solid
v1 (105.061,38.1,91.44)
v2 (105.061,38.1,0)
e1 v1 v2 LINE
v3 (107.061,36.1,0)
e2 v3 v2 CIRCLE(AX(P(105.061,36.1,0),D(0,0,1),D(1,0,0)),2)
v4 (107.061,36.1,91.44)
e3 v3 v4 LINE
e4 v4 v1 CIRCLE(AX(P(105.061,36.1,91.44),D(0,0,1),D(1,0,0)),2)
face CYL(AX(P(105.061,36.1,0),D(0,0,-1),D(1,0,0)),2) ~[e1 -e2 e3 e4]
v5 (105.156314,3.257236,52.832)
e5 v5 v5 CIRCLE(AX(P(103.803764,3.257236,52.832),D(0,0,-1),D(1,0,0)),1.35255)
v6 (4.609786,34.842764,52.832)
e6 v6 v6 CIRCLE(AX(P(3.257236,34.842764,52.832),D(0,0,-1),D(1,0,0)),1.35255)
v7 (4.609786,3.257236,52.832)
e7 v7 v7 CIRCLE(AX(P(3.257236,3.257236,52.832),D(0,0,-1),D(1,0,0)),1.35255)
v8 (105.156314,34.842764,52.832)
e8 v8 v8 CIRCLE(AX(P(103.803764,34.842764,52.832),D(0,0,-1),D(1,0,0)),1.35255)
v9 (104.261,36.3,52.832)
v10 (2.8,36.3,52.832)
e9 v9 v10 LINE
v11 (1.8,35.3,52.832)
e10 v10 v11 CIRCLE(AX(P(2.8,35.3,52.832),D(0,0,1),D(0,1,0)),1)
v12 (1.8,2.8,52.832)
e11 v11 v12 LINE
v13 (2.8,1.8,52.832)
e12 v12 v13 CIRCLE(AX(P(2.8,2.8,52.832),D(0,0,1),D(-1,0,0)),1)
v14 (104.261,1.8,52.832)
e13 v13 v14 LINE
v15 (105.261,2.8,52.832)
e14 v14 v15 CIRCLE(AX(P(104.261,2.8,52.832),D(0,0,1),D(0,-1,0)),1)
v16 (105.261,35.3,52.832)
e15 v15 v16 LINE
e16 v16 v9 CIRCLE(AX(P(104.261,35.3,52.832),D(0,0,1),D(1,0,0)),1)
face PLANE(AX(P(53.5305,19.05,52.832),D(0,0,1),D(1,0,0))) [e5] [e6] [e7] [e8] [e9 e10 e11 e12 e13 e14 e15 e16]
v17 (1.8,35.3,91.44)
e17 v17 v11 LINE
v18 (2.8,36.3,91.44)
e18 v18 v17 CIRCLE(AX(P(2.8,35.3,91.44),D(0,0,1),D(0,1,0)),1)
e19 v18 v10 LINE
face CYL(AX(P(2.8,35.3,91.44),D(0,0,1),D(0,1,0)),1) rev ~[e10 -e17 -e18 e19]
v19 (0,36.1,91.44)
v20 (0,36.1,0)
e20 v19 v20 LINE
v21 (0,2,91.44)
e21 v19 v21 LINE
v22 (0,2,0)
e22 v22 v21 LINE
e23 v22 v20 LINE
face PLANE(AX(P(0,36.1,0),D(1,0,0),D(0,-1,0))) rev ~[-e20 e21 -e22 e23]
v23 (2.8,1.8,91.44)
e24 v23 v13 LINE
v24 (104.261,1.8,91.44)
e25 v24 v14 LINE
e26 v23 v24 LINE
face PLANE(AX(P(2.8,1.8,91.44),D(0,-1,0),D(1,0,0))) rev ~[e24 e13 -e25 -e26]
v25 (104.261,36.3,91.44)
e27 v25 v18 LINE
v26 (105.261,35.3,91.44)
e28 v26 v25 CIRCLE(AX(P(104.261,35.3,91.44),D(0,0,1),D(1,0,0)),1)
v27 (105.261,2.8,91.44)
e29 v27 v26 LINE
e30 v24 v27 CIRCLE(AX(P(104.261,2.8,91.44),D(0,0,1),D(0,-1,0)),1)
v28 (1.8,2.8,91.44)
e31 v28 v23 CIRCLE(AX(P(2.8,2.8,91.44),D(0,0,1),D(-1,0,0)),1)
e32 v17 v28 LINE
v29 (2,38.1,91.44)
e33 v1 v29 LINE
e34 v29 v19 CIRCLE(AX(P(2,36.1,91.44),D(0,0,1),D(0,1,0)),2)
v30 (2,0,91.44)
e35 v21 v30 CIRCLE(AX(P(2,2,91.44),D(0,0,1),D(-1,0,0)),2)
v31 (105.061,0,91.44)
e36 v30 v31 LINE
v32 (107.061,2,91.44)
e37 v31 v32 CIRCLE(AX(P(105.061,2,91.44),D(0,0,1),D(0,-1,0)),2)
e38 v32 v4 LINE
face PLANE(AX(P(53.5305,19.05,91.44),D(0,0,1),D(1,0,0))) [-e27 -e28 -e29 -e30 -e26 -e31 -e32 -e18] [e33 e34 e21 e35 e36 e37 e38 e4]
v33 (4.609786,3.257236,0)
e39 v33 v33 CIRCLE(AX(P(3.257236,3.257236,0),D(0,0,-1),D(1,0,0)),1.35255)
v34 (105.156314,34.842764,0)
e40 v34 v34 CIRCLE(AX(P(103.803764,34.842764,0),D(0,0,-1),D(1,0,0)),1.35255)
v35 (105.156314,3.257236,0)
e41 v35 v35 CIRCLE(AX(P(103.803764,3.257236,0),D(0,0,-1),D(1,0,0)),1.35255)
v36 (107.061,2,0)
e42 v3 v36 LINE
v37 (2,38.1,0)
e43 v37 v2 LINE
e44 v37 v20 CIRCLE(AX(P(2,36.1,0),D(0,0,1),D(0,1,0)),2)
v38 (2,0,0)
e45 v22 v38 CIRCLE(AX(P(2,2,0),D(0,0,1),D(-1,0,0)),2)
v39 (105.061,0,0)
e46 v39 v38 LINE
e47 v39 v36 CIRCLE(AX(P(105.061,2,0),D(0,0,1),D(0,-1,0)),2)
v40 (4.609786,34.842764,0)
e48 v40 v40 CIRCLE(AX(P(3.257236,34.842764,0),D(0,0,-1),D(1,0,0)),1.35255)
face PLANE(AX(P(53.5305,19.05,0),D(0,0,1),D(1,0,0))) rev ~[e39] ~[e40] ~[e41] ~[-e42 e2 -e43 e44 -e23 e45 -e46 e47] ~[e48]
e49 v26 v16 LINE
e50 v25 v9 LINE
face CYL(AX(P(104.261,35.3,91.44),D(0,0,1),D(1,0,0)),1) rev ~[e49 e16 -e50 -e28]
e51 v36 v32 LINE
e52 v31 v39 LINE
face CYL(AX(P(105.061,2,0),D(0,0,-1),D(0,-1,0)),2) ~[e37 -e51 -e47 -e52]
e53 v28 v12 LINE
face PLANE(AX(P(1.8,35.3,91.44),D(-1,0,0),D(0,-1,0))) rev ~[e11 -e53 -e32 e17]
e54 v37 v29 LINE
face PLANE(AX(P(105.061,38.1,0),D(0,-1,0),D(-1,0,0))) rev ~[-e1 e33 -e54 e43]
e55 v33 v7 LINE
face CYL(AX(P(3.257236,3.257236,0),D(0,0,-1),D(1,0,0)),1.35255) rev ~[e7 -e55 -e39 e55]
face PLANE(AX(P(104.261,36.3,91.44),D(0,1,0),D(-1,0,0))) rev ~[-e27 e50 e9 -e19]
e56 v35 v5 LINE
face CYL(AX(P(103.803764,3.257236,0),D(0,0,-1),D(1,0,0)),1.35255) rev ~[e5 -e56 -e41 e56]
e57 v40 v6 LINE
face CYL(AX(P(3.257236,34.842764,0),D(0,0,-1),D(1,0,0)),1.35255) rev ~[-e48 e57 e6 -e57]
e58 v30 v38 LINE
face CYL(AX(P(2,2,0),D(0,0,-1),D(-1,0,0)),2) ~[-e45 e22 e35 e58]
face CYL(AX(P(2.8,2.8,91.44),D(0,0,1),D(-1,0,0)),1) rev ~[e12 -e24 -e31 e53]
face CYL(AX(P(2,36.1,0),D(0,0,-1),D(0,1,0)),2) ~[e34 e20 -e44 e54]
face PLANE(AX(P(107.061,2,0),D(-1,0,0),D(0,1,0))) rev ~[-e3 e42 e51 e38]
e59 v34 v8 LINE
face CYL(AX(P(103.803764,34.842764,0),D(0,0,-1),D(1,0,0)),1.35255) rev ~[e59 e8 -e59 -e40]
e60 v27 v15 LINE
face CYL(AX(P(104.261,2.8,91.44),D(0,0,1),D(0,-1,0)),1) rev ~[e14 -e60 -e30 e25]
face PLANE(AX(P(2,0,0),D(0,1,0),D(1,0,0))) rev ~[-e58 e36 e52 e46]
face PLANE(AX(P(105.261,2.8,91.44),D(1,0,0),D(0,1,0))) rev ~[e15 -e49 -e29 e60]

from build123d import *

# Parameters (mm, degrees)
F1_DEPTH = 91.44
F3_DEPTH = 38.608
F5_DEPTH = 4.7752
F6_R     = 1.35255
F7_DEPTH = 52.832


# Not quite as in the source:
# - a feature names something its author has since deleted; it is built from what else it names


with BuildPart() as f1:
    # F0 (on Top) → F1 (new body)
    with BuildSketch(Plane.XY):
        with BuildLine():
            ThreePointArc((0, 2), (0.5857864376, 0.5857864376), (2, 0))
            Line((2, 0), (105.061, 0))
            ThreePointArc((105.061, 0), (106.4752135624, 0.5857864376), (107.061, 2))
            Line((107.061, 2), (107.061, 36.1))
            ThreePointArc((107.061, 36.1), (106.4752135624, 37.5142135624), (105.061, 38.1))
            Line((105.061, 38.1), (2, 38.1))
            ThreePointArc((2, 38.1), (0.5857864376, 37.5142135624), (0, 36.1))
            Line((0, 36.1), (0, 2))
        make_face()
    extrude(amount=F1_DEPTH)

    # F2 (on face) → F3 (cut)
    with BuildSketch(Plane.XY.offset(91.44)):
        with BuildLine():
            Line((104.261, 36.3), (2.8, 36.3))
            ThreePointArc((2.8, 36.3), (2.0928932188, 36.0071067812), (1.8, 35.3))
            Line((1.8, 35.3), (1.8, 2.8))
            ThreePointArc((1.8, 2.8), (2.0928932188, 2.0928932188), (2.8, 1.8))
            Line((2.8, 1.8), (104.261, 1.8))
            ThreePointArc((104.261, 1.8), (104.9681067812, 2.0928932188), (105.261, 2.8))
            Line((105.261, 2.8), (105.261, 35.3))
            ThreePointArc((105.261, 35.3), (104.9681067812, 36.0071067812), (104.261, 36.3))
        make_face()
    extrude(amount=-F3_DEPTH, mode=Mode.SUBTRACT)

    # F4 (on face) → F5 (join)
    with BuildSketch(Plane(origin=(0, 0, 0), x_dir=(1, 0, 0), z_dir=(0, 0, -1))):
        with BuildLine():
            ThreePointArc((107.061, -2), (106.4752135624, -0.5857864376), (105.061, 0))
            Line((105.061, 0), (101.251, 0))
            Line((101.251, 0), (101.251, -2))
            ThreePointArc((101.251, -2), (102.3669231637, -4.6940768363), (105.061, -5.81))
            Line((105.061, -5.81), (107.061, -5.81))
            Line((107.061, -5.81), (107.061, -2))
        make_face()
        with BuildLine():
            Line((101.251, -36.1), (101.251, -38.1))
            Line((101.251, -38.1), (105.061, -38.1))
            ThreePointArc((105.061, -38.1), (106.4752135624, -37.5142135624), (107.061, -36.1))
            Line((107.061, -36.1), (107.061, -32.29))
            Line((107.061, -32.29), (105.061, -32.29))
            ThreePointArc((105.061, -32.29), (102.3669231637, -33.4059231637), (101.251, -36.1))
        make_face()
        with BuildLine():
            ThreePointArc((5.81, -36.1), (4.6940768363, -33.4059231637), (2, -32.29))
            Line((2, -32.29), (0, -32.29))
            Line((0, -32.29), (0, -36.1))
            ThreePointArc((0, -36.1), (0.5857864376, -37.5142135624), (2, -38.1))
            Line((2, -38.1), (5.81, -38.1))
            Line((5.81, -38.1), (5.81, -36.1))
        make_face()
        with BuildLine():
            Line((5.81, 0), (2, 0))
            ThreePointArc((2, 0), (0.5857864376, -0.5857864376), (0, -2))
            Line((0, -2), (0, -5.81))
            Line((0, -5.81), (2, -5.81))
            ThreePointArc((2, -5.81), (4.6940768363, -4.6940768363), (5.81, -2))
            Line((5.81, -2), (5.81, 0))
        make_face()
    extrude(amount=-F5_DEPTH)

    # F6 (on face) → F7 (cut, through all)
    with BuildSketch(Plane(origin=(0, 0, 0), x_dir=(1, 0, 0), z_dir=(0, 0, -1))):
        with Locations((103.8037641431, -3.2572358569)):
            Circle(F6_R)
        with Locations((3.2572358569, -3.2572358569)):
            Circle(F6_R)
        with Locations((3.2572358569, -34.8427641431)):
            Circle(F6_R)
        with Locations((103.8037641431, -34.8427641431)):
            Circle(F6_R)
    extrude(amount=-F7_DEPTH, mode=Mode.SUBTRACT)


solid = f1.part
